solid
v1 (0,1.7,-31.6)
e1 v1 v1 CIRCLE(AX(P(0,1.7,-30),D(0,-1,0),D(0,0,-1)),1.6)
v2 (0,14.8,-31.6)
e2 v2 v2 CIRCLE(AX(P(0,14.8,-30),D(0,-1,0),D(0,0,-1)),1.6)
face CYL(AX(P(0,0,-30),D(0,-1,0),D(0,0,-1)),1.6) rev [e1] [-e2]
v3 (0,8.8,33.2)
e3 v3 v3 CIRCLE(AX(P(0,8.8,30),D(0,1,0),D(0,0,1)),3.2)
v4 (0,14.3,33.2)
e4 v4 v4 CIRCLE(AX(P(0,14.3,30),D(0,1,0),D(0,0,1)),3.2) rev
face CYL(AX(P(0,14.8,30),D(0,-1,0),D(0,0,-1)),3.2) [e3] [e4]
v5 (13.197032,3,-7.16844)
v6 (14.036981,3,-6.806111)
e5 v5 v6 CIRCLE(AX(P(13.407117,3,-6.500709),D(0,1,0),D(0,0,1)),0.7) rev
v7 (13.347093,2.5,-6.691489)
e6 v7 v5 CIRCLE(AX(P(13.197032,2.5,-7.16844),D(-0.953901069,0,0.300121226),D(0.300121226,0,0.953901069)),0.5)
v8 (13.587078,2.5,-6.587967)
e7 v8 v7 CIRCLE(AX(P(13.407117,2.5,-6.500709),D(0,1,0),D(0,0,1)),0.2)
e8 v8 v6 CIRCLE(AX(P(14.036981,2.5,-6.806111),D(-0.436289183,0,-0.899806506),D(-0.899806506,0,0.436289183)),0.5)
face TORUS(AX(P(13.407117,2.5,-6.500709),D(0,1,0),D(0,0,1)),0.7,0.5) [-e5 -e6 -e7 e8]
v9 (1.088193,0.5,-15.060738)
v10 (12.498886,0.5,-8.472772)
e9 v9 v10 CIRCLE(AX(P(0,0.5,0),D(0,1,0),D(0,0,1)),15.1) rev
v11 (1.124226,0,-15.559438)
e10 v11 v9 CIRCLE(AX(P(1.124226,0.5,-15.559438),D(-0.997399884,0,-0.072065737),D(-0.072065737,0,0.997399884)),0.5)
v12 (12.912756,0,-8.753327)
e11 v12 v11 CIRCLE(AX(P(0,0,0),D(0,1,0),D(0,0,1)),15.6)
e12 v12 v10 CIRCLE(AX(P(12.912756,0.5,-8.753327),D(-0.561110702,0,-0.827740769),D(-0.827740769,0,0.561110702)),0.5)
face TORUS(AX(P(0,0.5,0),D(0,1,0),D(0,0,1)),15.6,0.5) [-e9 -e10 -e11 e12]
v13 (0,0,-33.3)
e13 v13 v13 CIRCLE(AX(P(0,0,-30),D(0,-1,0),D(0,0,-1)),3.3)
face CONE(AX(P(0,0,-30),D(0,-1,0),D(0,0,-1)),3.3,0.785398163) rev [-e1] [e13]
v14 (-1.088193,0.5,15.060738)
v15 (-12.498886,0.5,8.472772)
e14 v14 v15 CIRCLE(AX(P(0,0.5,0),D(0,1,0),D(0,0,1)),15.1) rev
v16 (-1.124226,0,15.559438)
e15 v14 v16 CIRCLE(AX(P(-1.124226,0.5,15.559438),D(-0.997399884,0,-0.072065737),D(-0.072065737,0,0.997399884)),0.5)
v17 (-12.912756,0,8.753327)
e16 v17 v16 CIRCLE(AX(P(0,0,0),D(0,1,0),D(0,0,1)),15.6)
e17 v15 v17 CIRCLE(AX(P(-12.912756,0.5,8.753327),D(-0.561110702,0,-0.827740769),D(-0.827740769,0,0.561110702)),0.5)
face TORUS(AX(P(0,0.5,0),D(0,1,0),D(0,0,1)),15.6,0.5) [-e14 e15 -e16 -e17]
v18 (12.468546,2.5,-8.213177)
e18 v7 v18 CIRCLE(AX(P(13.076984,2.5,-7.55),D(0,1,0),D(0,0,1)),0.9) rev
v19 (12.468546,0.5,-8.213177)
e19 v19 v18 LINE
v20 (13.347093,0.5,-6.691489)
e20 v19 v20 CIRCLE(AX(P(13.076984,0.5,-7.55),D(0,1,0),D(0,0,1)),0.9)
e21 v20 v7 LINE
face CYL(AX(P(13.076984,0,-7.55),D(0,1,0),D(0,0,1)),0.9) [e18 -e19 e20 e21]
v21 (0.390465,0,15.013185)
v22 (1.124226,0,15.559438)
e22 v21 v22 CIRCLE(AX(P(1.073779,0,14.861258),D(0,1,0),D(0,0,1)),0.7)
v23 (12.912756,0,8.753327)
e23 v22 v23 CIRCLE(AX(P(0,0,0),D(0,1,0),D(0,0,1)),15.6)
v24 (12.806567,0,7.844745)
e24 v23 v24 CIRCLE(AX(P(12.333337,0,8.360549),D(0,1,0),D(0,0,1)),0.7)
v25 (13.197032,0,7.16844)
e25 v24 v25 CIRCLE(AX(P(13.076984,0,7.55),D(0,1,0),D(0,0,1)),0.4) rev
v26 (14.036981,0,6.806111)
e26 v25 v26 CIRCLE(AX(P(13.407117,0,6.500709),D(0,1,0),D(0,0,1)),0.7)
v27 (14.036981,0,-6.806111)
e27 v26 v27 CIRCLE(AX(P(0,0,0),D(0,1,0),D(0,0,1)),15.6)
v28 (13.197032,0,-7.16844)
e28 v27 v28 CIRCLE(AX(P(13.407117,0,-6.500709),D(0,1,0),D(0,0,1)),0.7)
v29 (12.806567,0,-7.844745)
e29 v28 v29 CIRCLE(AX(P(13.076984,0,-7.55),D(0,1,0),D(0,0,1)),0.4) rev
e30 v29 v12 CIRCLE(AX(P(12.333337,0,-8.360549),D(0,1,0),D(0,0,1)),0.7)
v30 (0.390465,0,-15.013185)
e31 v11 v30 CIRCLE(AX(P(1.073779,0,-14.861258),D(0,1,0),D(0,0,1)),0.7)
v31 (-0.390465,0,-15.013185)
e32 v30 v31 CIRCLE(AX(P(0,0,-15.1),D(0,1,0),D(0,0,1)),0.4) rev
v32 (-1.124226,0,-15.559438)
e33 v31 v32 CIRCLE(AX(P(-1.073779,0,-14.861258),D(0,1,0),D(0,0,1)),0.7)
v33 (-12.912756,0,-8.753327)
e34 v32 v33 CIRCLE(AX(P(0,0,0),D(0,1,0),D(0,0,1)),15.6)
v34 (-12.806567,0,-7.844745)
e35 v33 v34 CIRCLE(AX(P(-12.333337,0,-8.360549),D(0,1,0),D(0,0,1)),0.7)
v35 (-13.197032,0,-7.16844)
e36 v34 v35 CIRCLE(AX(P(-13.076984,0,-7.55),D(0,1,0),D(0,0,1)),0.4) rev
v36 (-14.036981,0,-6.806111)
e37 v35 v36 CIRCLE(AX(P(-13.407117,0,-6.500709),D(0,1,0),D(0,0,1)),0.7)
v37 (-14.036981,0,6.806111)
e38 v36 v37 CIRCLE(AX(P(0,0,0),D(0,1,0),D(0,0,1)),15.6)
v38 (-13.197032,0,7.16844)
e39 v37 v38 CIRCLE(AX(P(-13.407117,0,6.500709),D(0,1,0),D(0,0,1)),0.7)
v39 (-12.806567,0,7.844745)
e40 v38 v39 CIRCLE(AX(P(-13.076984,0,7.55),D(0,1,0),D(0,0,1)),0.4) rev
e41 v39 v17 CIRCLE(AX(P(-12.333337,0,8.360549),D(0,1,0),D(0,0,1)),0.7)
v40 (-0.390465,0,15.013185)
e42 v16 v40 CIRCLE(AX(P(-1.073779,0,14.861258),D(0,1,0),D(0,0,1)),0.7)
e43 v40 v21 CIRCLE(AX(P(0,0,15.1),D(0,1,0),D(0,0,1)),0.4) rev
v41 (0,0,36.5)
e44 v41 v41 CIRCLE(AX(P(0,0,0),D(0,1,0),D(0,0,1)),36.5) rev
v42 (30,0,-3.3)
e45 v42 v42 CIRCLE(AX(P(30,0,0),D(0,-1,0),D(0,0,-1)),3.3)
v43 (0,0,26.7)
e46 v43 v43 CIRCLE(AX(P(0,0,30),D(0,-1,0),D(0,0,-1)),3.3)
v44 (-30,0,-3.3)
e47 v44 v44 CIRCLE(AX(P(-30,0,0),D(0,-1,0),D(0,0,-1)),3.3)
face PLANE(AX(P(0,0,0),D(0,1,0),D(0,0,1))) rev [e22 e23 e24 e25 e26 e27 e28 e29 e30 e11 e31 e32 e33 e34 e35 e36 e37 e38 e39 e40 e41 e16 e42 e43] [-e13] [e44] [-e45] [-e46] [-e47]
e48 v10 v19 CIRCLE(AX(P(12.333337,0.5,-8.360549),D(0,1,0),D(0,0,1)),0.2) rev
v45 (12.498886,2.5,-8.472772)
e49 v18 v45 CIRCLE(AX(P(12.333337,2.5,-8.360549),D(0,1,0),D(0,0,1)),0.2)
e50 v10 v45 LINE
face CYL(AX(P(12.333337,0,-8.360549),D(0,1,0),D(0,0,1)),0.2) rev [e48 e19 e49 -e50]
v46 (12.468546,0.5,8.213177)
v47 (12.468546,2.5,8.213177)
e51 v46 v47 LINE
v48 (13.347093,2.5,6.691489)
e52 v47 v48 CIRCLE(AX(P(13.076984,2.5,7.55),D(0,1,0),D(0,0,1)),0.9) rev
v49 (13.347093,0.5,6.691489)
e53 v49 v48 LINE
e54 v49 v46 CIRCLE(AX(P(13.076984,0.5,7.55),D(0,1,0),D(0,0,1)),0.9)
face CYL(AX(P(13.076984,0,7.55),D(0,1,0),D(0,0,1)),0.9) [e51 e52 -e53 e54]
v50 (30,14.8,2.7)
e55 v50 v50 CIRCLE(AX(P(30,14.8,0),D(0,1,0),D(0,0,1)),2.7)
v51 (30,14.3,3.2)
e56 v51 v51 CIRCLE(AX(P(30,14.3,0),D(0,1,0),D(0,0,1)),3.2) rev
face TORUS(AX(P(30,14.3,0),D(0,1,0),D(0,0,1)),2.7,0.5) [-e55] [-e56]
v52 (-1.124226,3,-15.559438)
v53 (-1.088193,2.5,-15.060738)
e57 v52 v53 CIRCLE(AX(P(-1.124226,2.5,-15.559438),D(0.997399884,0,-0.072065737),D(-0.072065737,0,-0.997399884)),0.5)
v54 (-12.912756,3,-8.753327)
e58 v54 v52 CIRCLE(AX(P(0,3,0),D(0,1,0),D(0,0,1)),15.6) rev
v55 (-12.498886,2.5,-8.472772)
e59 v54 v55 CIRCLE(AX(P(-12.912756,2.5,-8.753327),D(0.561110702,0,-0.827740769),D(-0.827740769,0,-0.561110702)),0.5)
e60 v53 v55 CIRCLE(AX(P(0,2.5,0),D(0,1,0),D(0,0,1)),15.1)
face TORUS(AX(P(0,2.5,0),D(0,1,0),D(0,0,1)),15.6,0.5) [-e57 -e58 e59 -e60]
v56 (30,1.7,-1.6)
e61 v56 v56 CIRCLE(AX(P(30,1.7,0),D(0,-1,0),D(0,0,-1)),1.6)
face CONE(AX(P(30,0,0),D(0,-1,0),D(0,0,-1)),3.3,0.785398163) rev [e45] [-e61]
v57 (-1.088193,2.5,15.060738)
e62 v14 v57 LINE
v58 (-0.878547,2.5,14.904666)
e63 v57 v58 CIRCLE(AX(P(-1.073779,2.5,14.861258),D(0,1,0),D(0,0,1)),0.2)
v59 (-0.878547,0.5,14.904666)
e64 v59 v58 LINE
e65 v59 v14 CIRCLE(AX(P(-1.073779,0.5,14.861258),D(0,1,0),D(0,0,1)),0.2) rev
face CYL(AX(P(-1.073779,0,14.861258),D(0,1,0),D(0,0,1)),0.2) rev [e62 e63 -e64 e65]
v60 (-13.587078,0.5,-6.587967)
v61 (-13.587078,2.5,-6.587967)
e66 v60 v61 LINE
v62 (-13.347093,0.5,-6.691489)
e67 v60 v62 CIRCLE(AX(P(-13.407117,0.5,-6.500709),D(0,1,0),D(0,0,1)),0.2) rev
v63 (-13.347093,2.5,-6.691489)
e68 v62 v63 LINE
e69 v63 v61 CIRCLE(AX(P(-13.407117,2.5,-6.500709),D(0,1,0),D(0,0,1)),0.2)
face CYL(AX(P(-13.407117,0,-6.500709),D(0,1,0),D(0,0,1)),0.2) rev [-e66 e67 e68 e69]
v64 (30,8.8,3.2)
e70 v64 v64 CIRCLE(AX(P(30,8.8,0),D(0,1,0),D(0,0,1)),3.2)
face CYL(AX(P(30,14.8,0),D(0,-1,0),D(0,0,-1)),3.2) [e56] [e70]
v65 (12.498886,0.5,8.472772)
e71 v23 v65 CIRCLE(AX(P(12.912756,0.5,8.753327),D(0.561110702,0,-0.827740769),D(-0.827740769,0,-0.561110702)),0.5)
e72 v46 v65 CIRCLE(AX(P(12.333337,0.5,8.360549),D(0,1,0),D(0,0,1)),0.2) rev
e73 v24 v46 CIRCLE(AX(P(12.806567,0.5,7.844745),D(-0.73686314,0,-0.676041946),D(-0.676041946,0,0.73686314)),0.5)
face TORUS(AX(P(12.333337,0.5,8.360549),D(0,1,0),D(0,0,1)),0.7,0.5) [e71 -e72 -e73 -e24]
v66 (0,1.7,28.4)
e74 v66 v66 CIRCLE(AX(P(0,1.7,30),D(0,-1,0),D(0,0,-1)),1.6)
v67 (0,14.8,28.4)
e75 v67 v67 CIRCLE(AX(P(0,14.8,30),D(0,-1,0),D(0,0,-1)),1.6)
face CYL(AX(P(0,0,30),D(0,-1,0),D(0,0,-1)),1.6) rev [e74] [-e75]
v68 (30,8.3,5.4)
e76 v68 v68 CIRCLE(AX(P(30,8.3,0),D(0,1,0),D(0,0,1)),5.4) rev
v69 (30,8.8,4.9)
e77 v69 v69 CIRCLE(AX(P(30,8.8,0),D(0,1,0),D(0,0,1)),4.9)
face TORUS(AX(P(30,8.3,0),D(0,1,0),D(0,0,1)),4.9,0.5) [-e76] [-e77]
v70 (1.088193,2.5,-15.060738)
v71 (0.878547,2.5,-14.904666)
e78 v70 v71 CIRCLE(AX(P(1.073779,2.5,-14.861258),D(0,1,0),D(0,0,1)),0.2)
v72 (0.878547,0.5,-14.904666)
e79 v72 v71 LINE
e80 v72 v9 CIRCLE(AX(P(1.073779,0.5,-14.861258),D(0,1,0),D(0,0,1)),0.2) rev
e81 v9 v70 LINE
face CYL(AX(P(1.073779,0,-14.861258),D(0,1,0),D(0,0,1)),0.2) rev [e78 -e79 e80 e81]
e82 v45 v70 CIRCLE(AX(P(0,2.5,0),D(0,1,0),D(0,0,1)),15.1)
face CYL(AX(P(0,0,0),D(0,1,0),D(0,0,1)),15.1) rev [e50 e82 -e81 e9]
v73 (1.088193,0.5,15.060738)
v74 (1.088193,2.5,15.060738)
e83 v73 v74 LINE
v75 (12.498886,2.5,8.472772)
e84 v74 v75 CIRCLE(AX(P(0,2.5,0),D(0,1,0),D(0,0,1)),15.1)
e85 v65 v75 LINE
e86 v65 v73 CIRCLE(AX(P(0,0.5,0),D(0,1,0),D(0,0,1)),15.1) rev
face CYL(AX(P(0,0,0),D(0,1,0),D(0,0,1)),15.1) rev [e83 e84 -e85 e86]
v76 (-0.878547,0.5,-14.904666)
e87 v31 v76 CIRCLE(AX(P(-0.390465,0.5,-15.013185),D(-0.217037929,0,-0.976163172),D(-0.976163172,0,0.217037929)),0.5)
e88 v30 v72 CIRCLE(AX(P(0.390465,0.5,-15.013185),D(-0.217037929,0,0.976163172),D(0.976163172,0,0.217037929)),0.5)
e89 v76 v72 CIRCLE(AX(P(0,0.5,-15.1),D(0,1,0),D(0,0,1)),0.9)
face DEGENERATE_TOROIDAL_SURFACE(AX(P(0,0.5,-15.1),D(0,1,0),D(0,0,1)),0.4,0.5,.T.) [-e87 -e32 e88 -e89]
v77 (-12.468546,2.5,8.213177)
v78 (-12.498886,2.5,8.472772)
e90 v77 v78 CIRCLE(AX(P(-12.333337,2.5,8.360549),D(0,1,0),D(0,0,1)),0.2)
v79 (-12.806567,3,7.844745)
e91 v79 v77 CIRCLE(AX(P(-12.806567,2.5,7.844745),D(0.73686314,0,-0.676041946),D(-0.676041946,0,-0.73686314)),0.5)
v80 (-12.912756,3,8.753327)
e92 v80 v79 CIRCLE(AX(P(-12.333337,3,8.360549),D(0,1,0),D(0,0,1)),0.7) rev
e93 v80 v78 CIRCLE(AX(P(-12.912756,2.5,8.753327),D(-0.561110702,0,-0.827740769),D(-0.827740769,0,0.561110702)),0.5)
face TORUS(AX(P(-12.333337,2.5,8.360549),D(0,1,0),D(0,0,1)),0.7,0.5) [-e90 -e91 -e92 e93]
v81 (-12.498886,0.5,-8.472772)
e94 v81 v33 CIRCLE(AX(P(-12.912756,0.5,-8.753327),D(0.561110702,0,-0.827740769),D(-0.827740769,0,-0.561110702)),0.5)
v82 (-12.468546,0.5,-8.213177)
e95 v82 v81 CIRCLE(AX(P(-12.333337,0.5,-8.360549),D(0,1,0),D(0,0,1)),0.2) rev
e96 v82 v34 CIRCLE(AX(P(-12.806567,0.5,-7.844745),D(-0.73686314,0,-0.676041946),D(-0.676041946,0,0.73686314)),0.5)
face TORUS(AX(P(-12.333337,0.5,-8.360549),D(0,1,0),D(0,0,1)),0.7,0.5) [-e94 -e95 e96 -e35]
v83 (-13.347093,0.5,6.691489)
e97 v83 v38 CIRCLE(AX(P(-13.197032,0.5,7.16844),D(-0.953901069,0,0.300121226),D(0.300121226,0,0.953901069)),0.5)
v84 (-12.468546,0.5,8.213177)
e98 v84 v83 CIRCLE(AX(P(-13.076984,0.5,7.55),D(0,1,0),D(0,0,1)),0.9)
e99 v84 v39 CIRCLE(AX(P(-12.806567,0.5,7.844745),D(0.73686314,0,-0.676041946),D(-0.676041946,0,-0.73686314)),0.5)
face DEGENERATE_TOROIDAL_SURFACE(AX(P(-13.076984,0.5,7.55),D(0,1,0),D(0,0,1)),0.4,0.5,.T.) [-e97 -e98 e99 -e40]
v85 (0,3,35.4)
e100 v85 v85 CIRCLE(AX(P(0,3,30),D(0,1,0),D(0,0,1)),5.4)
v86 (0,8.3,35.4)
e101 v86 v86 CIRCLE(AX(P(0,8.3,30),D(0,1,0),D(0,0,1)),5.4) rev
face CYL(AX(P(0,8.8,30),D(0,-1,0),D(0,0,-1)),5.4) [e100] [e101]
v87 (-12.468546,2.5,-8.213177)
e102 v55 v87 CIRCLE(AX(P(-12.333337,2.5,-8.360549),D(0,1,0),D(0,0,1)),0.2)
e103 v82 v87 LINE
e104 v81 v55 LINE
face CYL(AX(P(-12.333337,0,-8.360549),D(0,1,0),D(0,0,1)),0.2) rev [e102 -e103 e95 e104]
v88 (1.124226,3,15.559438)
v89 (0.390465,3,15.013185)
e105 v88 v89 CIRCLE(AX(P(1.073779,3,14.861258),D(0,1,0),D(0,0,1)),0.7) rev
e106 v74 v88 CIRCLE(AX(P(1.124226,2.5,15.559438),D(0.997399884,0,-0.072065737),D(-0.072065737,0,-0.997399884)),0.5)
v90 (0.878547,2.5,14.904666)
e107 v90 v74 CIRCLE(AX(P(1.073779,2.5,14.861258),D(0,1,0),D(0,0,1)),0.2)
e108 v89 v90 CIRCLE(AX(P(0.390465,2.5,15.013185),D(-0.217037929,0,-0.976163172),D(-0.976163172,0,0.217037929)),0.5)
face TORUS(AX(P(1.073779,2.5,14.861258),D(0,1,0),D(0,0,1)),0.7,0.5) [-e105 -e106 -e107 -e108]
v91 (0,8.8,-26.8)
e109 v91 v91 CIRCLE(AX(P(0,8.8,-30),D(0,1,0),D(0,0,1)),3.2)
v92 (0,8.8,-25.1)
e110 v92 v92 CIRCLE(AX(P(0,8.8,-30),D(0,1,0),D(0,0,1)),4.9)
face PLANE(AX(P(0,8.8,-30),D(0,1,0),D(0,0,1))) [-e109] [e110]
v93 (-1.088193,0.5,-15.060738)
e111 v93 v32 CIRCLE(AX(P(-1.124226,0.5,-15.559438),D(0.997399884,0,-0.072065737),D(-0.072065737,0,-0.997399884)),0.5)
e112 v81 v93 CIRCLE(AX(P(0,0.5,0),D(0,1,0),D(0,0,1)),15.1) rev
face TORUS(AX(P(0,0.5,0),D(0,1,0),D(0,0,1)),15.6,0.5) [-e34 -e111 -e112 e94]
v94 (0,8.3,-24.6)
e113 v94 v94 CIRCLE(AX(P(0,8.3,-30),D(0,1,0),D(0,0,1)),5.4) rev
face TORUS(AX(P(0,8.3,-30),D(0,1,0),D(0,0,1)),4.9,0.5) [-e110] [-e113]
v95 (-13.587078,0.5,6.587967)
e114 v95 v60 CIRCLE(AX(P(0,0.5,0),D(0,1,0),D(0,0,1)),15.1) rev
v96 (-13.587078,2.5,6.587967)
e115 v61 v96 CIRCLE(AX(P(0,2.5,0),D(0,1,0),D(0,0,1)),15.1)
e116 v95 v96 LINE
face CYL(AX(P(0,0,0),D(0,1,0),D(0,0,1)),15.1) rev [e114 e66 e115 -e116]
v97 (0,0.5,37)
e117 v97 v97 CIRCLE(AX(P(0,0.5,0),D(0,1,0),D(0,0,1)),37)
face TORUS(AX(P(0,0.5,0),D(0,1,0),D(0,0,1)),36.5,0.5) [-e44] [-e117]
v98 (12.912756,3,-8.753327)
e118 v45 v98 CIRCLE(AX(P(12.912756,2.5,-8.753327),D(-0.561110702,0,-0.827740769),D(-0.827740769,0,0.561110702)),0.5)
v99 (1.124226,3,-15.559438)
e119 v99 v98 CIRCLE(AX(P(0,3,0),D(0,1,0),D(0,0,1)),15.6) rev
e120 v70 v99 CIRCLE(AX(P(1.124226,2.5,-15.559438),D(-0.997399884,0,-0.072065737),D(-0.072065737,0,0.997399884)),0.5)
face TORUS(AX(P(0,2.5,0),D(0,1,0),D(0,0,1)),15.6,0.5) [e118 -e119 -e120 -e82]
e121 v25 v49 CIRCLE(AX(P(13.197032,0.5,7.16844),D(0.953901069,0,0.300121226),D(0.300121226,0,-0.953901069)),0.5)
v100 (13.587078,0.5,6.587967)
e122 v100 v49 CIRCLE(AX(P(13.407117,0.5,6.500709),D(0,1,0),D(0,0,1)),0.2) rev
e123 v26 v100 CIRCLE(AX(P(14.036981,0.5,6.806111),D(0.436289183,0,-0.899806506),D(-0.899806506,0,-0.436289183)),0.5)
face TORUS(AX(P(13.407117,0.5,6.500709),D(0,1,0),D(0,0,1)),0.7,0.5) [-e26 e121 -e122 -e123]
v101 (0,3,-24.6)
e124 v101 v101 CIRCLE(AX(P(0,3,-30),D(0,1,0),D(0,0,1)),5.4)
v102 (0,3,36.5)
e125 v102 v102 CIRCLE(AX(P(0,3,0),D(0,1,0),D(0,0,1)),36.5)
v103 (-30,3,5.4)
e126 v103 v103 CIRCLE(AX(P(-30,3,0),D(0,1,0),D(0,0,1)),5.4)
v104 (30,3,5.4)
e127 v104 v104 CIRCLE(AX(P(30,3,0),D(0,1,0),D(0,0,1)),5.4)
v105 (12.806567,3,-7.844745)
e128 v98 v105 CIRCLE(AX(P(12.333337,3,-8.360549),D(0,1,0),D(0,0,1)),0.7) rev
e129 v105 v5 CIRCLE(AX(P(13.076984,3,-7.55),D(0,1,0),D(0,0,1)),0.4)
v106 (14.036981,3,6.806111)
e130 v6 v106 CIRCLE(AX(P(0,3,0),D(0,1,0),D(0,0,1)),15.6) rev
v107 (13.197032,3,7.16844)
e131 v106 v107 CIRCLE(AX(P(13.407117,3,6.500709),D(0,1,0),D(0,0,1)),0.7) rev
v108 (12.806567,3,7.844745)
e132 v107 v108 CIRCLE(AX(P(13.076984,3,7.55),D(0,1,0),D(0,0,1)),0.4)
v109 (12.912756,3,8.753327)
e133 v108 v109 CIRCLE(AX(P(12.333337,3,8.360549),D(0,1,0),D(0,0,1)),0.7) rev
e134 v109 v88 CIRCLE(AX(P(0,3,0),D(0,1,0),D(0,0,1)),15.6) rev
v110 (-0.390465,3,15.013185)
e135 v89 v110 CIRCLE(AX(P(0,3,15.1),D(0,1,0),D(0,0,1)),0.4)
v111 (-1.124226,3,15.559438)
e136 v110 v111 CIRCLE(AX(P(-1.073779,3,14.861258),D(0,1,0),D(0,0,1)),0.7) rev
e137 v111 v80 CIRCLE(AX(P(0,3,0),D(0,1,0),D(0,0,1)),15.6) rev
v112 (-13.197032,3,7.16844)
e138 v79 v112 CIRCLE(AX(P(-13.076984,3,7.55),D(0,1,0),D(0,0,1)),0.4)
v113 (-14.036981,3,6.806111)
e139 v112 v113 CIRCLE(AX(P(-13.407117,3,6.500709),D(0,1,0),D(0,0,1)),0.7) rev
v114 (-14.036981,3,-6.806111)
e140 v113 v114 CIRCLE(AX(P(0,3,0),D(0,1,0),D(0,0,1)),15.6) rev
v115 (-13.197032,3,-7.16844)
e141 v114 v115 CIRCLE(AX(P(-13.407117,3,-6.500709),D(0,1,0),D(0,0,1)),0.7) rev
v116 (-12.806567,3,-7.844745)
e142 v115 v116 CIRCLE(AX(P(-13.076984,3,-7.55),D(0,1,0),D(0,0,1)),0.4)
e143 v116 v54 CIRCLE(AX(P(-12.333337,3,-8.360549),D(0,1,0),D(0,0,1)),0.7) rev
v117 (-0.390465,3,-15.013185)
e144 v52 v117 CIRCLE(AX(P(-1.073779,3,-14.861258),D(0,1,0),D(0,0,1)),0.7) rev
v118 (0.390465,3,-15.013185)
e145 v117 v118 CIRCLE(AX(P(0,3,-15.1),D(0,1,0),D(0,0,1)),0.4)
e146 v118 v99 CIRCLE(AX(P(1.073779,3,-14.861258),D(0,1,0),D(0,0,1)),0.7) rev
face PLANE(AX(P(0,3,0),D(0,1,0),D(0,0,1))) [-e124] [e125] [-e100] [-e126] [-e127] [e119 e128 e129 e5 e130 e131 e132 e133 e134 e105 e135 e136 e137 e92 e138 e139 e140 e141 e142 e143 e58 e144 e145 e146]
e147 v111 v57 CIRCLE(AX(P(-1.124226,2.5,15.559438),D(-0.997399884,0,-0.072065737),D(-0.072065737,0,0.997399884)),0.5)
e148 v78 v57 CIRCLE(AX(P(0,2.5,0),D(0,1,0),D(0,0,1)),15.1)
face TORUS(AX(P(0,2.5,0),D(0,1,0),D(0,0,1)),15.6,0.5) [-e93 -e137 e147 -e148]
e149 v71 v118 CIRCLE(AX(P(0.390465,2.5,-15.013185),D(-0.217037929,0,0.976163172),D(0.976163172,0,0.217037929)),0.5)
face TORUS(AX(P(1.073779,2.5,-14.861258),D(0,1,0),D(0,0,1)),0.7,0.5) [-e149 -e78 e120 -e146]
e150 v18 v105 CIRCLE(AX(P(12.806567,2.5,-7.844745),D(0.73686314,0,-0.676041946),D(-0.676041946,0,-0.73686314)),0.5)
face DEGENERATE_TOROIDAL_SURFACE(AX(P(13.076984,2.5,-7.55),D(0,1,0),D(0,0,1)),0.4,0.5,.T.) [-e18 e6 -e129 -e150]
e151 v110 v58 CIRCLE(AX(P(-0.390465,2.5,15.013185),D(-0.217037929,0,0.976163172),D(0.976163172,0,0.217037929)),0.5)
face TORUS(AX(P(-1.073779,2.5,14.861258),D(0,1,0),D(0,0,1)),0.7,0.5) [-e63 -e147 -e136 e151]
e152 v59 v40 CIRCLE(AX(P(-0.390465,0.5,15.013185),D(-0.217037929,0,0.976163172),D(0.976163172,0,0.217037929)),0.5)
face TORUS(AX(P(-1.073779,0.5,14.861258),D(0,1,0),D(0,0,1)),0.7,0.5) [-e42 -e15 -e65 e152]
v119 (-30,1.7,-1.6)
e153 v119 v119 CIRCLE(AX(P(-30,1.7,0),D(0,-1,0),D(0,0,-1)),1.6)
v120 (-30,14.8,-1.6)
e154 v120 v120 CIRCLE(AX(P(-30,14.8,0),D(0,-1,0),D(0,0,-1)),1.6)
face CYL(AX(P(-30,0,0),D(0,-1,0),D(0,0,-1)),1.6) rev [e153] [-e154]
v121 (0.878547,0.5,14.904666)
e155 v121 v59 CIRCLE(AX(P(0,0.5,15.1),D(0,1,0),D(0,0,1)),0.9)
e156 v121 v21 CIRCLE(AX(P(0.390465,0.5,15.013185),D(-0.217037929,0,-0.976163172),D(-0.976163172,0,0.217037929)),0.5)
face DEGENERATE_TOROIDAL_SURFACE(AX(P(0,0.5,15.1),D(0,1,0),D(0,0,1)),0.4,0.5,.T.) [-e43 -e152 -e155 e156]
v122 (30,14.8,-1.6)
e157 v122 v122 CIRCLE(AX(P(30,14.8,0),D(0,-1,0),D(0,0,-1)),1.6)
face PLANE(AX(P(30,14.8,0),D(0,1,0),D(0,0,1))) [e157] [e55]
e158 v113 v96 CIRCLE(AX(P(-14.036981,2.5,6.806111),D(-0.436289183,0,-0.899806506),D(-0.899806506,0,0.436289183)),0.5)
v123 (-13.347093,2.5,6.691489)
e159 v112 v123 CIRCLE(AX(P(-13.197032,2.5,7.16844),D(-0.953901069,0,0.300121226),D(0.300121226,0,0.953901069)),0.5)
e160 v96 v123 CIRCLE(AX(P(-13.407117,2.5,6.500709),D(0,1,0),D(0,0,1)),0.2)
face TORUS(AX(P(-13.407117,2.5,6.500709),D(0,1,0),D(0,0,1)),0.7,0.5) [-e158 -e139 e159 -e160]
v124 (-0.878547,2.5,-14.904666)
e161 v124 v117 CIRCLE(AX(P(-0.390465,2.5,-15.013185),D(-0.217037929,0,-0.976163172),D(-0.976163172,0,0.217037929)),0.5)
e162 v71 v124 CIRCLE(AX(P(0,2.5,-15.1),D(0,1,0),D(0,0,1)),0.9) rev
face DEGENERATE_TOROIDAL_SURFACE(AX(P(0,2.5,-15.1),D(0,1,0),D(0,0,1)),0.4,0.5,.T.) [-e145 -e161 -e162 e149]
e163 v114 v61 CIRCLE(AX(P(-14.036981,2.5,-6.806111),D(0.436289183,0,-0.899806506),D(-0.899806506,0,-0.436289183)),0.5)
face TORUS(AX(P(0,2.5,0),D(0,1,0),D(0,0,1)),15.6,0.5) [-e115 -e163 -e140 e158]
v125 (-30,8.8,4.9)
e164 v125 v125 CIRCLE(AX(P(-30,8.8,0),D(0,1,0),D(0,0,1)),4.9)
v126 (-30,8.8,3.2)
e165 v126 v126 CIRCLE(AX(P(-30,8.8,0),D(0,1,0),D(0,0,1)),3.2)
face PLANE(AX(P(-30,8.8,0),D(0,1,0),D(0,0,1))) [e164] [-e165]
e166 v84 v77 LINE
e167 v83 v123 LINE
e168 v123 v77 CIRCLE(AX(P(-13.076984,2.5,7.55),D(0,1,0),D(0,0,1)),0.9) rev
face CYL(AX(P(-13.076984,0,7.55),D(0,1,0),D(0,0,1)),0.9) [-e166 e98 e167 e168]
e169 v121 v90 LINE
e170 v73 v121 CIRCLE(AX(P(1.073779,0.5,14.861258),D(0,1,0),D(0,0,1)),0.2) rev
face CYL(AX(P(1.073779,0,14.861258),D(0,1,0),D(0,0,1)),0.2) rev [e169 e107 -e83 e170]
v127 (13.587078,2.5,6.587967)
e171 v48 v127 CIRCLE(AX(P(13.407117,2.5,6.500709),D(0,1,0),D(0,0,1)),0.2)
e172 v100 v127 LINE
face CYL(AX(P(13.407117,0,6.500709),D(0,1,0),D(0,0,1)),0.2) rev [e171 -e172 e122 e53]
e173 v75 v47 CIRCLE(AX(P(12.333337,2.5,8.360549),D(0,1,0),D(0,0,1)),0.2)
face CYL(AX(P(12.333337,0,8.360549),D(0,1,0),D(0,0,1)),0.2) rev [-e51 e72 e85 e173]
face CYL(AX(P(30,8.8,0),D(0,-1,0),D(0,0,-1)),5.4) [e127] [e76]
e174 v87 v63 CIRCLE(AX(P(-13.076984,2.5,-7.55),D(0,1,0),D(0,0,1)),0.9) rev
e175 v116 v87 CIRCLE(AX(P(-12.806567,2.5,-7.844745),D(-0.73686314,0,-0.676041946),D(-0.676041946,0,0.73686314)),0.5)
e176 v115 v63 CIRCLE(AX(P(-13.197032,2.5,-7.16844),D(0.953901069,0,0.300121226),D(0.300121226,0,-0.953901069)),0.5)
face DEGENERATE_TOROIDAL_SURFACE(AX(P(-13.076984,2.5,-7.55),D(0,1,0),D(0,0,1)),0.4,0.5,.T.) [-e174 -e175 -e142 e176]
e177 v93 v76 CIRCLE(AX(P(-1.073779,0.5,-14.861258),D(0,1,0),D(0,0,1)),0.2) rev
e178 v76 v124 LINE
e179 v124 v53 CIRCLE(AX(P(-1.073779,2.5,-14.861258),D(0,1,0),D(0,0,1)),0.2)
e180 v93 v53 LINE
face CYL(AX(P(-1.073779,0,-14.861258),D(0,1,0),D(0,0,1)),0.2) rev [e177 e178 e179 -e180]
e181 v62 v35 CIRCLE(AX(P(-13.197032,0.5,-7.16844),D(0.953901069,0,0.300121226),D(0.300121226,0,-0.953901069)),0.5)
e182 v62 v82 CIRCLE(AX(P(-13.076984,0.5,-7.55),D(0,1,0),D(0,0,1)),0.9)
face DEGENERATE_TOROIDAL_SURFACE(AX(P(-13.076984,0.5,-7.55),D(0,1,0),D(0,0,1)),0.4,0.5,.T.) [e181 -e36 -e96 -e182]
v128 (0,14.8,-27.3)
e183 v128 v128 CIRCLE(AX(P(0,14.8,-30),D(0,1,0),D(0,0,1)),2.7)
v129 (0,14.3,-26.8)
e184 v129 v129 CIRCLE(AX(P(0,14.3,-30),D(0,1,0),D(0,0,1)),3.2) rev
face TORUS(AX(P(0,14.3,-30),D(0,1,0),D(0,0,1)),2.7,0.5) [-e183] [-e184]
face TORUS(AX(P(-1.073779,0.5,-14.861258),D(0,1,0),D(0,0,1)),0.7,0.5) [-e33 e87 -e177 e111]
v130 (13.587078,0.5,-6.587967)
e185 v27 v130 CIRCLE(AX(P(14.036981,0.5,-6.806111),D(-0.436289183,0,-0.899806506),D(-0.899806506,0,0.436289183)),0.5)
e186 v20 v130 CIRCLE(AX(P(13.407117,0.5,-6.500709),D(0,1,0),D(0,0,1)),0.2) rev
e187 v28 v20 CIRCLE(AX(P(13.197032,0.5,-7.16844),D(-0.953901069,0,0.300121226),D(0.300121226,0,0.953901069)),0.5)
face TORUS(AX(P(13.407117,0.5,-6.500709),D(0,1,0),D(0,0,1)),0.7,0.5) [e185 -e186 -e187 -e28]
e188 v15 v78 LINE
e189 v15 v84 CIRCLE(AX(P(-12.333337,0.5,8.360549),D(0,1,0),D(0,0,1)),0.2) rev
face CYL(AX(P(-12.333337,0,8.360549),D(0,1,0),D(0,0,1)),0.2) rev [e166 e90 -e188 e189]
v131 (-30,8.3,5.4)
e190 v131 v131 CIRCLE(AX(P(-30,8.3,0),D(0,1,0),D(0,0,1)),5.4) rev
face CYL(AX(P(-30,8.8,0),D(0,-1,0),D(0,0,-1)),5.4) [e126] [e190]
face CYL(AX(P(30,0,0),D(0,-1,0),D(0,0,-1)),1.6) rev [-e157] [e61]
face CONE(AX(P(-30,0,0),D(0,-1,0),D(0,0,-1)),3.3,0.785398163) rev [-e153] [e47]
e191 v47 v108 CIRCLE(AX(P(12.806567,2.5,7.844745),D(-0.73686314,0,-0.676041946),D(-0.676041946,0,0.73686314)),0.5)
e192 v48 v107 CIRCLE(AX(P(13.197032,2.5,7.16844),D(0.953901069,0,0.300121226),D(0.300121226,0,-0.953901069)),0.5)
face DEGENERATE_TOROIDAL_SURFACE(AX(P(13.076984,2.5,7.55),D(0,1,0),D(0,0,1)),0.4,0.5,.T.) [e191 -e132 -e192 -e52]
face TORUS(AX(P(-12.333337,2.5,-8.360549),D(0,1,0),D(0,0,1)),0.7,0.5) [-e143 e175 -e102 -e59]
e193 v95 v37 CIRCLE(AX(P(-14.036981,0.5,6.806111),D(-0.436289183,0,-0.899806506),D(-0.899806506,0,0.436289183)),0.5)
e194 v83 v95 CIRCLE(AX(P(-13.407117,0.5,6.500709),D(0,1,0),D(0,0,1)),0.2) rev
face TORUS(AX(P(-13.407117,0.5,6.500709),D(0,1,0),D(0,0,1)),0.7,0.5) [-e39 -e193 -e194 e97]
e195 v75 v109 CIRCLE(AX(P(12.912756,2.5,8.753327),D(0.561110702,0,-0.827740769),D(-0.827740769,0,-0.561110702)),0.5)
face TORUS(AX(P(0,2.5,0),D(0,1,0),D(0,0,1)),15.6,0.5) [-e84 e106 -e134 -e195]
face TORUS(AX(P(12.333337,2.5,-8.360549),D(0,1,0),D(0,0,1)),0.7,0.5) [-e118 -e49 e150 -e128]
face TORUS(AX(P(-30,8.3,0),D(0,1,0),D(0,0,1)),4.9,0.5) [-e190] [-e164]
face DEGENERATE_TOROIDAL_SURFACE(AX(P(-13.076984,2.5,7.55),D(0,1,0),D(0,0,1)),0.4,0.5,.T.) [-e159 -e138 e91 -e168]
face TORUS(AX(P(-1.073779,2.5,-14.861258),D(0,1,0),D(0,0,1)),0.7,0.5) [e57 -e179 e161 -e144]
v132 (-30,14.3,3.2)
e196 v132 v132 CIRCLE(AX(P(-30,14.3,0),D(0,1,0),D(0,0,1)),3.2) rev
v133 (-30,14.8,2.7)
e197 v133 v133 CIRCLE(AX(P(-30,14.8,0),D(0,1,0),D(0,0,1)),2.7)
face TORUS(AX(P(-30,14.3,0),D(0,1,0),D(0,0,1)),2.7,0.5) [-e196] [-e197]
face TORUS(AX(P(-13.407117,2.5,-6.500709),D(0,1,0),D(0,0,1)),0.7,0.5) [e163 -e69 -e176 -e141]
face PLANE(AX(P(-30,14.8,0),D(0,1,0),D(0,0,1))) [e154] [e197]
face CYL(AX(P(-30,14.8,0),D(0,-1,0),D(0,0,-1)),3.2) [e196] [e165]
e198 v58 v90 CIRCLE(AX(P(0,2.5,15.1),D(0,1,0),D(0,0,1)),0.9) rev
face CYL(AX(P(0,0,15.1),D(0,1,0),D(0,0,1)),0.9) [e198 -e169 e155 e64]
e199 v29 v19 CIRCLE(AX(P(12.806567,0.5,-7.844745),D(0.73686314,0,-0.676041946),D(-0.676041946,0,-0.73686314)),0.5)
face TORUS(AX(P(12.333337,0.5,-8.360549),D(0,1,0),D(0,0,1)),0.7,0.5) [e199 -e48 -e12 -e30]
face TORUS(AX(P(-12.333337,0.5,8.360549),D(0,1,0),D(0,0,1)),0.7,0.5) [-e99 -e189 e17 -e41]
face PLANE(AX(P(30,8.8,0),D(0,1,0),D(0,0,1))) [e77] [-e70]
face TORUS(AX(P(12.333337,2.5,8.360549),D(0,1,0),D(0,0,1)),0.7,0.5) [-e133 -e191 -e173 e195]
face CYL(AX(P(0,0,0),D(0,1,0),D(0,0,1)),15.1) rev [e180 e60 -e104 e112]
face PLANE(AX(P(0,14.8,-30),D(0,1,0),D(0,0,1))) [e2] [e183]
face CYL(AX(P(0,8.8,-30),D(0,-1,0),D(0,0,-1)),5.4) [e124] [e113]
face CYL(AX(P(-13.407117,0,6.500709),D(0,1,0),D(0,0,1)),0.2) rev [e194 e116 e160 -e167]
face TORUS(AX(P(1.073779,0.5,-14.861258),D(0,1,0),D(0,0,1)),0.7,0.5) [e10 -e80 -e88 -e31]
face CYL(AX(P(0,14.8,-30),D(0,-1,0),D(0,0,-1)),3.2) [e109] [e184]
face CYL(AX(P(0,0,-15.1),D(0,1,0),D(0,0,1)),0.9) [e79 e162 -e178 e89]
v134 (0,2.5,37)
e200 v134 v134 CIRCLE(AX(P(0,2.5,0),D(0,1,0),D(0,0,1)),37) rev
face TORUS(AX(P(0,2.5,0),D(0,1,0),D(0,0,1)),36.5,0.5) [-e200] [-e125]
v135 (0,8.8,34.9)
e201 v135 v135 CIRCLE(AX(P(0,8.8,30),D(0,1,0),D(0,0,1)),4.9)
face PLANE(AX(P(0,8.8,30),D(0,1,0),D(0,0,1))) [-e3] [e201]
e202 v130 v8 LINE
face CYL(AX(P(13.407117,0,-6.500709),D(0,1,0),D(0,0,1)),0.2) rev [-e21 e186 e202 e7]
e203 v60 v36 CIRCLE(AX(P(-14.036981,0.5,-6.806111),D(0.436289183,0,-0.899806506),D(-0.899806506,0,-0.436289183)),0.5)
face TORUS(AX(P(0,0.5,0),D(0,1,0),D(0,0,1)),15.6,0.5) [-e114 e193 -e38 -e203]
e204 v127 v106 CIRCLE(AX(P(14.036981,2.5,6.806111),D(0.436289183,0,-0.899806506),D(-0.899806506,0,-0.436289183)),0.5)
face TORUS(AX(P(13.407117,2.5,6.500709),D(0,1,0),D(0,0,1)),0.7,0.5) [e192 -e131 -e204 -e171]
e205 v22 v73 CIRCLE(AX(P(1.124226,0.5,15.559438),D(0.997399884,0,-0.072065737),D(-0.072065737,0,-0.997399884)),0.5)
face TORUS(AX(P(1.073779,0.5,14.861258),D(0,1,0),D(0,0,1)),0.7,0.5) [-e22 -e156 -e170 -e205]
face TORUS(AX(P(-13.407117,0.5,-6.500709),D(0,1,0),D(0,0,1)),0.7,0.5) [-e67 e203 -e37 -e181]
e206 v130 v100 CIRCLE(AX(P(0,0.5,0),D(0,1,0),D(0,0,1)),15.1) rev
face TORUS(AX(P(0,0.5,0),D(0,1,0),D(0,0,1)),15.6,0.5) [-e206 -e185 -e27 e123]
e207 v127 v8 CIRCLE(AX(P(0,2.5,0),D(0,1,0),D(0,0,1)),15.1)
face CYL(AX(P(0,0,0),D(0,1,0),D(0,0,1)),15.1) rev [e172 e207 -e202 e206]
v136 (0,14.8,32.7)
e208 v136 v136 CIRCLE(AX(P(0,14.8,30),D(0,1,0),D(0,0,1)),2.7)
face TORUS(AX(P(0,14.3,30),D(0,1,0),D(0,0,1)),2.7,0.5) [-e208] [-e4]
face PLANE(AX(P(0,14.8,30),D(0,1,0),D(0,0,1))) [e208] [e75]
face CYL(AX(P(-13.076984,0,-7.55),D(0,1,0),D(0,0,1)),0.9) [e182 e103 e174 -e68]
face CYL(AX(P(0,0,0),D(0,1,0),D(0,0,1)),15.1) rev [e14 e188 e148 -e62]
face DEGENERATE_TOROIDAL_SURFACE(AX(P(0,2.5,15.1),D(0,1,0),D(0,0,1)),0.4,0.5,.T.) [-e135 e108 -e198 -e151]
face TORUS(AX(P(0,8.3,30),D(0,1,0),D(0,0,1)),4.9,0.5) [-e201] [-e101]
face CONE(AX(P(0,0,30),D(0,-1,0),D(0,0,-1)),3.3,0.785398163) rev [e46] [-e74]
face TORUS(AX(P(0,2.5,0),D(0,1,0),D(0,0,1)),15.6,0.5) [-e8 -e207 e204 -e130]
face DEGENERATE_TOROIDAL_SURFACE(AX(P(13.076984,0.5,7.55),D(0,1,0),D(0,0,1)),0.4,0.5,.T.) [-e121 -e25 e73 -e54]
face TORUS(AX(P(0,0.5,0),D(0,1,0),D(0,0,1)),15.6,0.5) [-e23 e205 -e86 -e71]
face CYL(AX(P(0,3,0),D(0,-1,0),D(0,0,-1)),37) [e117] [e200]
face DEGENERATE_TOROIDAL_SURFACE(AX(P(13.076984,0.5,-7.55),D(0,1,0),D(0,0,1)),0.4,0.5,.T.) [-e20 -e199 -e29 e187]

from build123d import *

# Parameters (mm, degrees)
SKETCH_1_R               = 37
EXTRUDE_1_DEPTH          = 3
CUT_EXTRUDE_1_DEPTH      = 53.411830726
SKETCH_3_R               = 5.4
EXTRUDE_2_DEPTH          = 5.8
SKETCH_4_R               = 3.2
EXTRUDE_3_DEPTH          = 6
PATTERN_CIRCULAR_1_COUNT = 4
FILLET_1_R               = 0.5
FILLET_2_R               = 0.5


# Read off the part's stored shape, not the designer's step: 高级异型孔1
with BuildPart() as part:
    # 草图1 → 凸台-拉伸1 (new body)
    with BuildSketch(Plane(origin=(0, 0, 0), x_dir=(1, 0, 0), z_dir=(0, 1, 0))):
        with Locations(Location((0, 0, 0), (0, 0, 270))):
            Circle(SKETCH_1_R)
    extrude(amount=EXTRUDE_1_DEPTH)

    # 草图2 → 切除-拉伸1 (cut, through all)
    with BuildSketch(Plane(origin=(0, 3, 0), x_dir=(1, 0, 0), z_dir=(0, 1, 0))):
        with BuildLine():
            ThreePointArc((-1.088192636, 15.060738255), (-7.55, 13.076983597), (-12.498885611, 8.472771595))
            ThreePointArc((-12.498885611, 8.472771595), (-12.53198535, 8.337332768), (-12.468545846, 8.213176826))
            ThreePointArc((-12.468545846, 8.213176826), (-12.297560734, 7.1), (-13.3470927, 6.691489038))
            ThreePointArc((-13.3470927, 6.691489038), (-13.486334652, 6.684351289), (-13.587078247, 6.58796666))
            ThreePointArc((-13.587078247, 6.58796666), (-15.1, 0), (-13.587078247, -6.58796666))
            ThreePointArc((-13.587078247, -6.58796666), (-13.486334652, -6.684351289), (-13.3470927, -6.691489038))
            ThreePointArc((-13.3470927, -6.691489038), (-12.297560734, -7.1), (-12.468545846, -8.213176826))
            ThreePointArc((-12.468545846, -8.213176826), (-12.53198535, -8.337332768), (-12.498885611, -8.472771595))
            ThreePointArc((-12.498885611, -8.472771595), (-7.55, -13.076983597), (-1.088192636, -15.060738255))
            ThreePointArc((-1.088192636, -15.060738255), (-0.954349302, -15.021684057), (-0.878546854, -14.904665864))
            ThreePointArc((-0.878546854, -14.904665864), (0, -14.2), (0.878546854, -14.904665864))
            ThreePointArc((0.878546854, -14.904665864), (0.954349302, -15.021684057), (1.088192636, -15.060738255))
            ThreePointArc((1.088192636, -15.060738255), (7.55, -13.076983597), (12.498885611, -8.472771595))
            ThreePointArc((12.498885611, -8.472771595), (12.53198535, -8.337332768), (12.468545846, -8.213176826))
            ThreePointArc((12.468545846, -8.213176826), (12.297560734, -7.1), (13.3470927, -6.691489038))
            ThreePointArc((13.3470927, -6.691489038), (13.486334652, -6.684351289), (13.587078247, -6.58796666))
            ThreePointArc((13.587078247, -6.58796666), (15.1, 0), (13.587078247, 6.58796666))
            ThreePointArc((13.587078247, 6.58796666), (13.486334652, 6.684351289), (13.3470927, 6.691489038))
            ThreePointArc((13.3470927, 6.691489038), (12.297560734, 7.1), (12.468545846, 8.213176826))
            ThreePointArc((12.468545846, 8.213176826), (12.53198535, 8.337332768), (12.498885611, 8.472771595))
            ThreePointArc((12.498885611, 8.472771595), (7.55, 13.076983597), (1.088192636, 15.060738255))
            ThreePointArc((1.088192636, 15.060738255), (0.954349302, 15.021684057), (0.878546854, 14.904665864))
            ThreePointArc((0.878546854, 14.904665864), (0, 14.2), (-0.878546854, 14.904665864))
            ThreePointArc((-0.878546854, 14.904665864), (-0.954349302, 15.021684057), (-1.088192636, 15.060738255))
        make_face()
    extrude(amount=-CUT_EXTRUDE_1_DEPTH, mode=Mode.SUBTRACT)

    # 草图3 → 凸台-拉伸2 (add)
    with BuildSketch(Plane(origin=(0, 3, 0), x_dir=(1, 0, 0), z_dir=(0, 1, 0))):
        with Locations(Location((0, 30, 0), (0, 0, 270))):
            Circle(SKETCH_3_R)
        with Locations(Location((30, 0, 0), (0, 0, 270))):
            Circle(SKETCH_3_R)
        with Locations(Location((0, -30, 0), (0, 0, 270))):
            Circle(SKETCH_3_R)
        with Locations(Location((-30, 0, 0), (0, 0, 270))):
            Circle(SKETCH_3_R)
    extrude(amount=EXTRUDE_2_DEPTH)

    # 草图4 → 凸台-拉伸3 (add)
    with BuildSketch(Plane(origin=(0, 8.8, 0), x_dir=(1, 0, 0), z_dir=(0, 1, 0))):
        with Locations(Location((0, 30, 0), (0, 0, 270))):
            Circle(SKETCH_4_R)
        with Locations(Location((30, 0, 0), (0, 0, 270))):
            Circle(SKETCH_4_R)
        with Locations(Location((0, -30, 0), (0, 0, 270))):
            Circle(SKETCH_4_R)
        with Locations(Location((-30, 0, 0), (0, 0, 270))):
            Circle(SKETCH_4_R)
    extrude(amount=EXTRUDE_3_DEPTH)

    # 高级异型孔1 outline → 高级异型孔1 (revolve, cut)
    with BuildSketch(Plane.XY.offset(30)):
        Polygon((0, 0), (3.3, 0), (1.6, 1.7), (1.6, 14.8), (0, 14.8), align=None)
    other_1 = revolve(axis=Axis((0, 0, 30), (0, 1, 0)), mode=Mode.SUBTRACT)

    # 阵列(圆周)1: 高级异型孔1 ×4 about axis
    pattern_circular_1_axis = Axis((0, 0, 0), (0, 1, 0))
    for i in range(1, PATTERN_CIRCULAR_1_COUNT):
        add(other_1.rotate(pattern_circular_1_axis, i * 360 / PATTERN_CIRCULAR_1_COUNT), mode=Mode.SUBTRACT)

    # 圆角1
    fillet_1_edges = [part.edges().sort_by_distance(p)[0] for p in [
        (0.954349302, 0, -15.021684057),
        (7.55, 0, -13.076983597),
        (12.53198535, 0, -8.337332768),
        (12.297560734, 0, -7.1),
        (13.486334652, 0, -6.684351289),
        (15.1, 0, 0),
        (13.486334652, 0, 6.684351289),
        (12.297560734, 0, 7.1),
        (12.53198535, 0, 8.337332768),
        (7.55, 0, 13.076983597),
        (0.954349302, 0, 15.021684057),
        (0, 0, 14.2),
        (-0.954349302, 0, 15.021684057),
        (-7.55, 0, 13.076983597),
        (-12.53198535, 0, 8.337332768),
        (-12.297560734, 0, 7.1),
        (-13.486334652, 0, 6.684351289),
        (-15.1, 0, 0),
        (-13.486334652, 0, -6.684351289),
        (-12.297560734, 0, -7.1),
        (-12.53198535, 0, -8.337332768),
        (-7.55, 0, -13.076983597),
        (-0.954349302, 0, -15.021684057),
        (0, 0, -14.2),
        (0.954349302, 3, -15.021684057),
        (0, 3, -14.2),
        (-0.954349302, 3, -15.021684057),
        (-7.55, 3, -13.076983597),
        (-12.53198535, 3, -8.337332768),
        (-12.297560734, 3, -7.1),
        (-13.486334652, 3, -6.684351289),
        (-15.1, 3, 0),
        (-13.486334652, 3, 6.684351289),
        (-12.297560734, 3, 7.1),
        (-12.53198535, 3, 8.337332768),
        (-7.55, 3, 13.076983597),
        (-0.954349302, 3, 15.021684057),
        (0, 3, 14.2),
        (0.954349302, 3, 15.021684057),
        (7.55, 3, 13.076983597),
        (12.53198535, 3, 8.337332768),
        (12.297560734, 3, 7.1),
        (13.486334652, 3, 6.684351289),
        (15.1, 3, 0),
        (13.486334652, 3, -6.684351289),
        (12.297560734, 3, -7.1),
        (12.53198535, 3, -8.337332768),
        (7.55, 3, -13.076983597),
    ]]
    fillet(fillet_1_edges, radius=FILLET_1_R)

    # 圆角2
    fillet_2_edges = [part.edges().sort_by_distance(p)[0] for p in [
        (0, 14.8, -33.2),
        (30, 14.8, -3.2),
        (0, 14.8, 26.8),
        (-30, 14.8, -3.2),
        (0, 0, -37),
        (0, 3, -37),
        (0, 8.8, -35.4),
        (30, 8.8, -5.4),
        (0, 8.8, 24.6),
        (-30, 8.8, -5.4),
    ]]
    fillet(fillet_2_edges, radius=FILLET_2_R)


solid = part.part
